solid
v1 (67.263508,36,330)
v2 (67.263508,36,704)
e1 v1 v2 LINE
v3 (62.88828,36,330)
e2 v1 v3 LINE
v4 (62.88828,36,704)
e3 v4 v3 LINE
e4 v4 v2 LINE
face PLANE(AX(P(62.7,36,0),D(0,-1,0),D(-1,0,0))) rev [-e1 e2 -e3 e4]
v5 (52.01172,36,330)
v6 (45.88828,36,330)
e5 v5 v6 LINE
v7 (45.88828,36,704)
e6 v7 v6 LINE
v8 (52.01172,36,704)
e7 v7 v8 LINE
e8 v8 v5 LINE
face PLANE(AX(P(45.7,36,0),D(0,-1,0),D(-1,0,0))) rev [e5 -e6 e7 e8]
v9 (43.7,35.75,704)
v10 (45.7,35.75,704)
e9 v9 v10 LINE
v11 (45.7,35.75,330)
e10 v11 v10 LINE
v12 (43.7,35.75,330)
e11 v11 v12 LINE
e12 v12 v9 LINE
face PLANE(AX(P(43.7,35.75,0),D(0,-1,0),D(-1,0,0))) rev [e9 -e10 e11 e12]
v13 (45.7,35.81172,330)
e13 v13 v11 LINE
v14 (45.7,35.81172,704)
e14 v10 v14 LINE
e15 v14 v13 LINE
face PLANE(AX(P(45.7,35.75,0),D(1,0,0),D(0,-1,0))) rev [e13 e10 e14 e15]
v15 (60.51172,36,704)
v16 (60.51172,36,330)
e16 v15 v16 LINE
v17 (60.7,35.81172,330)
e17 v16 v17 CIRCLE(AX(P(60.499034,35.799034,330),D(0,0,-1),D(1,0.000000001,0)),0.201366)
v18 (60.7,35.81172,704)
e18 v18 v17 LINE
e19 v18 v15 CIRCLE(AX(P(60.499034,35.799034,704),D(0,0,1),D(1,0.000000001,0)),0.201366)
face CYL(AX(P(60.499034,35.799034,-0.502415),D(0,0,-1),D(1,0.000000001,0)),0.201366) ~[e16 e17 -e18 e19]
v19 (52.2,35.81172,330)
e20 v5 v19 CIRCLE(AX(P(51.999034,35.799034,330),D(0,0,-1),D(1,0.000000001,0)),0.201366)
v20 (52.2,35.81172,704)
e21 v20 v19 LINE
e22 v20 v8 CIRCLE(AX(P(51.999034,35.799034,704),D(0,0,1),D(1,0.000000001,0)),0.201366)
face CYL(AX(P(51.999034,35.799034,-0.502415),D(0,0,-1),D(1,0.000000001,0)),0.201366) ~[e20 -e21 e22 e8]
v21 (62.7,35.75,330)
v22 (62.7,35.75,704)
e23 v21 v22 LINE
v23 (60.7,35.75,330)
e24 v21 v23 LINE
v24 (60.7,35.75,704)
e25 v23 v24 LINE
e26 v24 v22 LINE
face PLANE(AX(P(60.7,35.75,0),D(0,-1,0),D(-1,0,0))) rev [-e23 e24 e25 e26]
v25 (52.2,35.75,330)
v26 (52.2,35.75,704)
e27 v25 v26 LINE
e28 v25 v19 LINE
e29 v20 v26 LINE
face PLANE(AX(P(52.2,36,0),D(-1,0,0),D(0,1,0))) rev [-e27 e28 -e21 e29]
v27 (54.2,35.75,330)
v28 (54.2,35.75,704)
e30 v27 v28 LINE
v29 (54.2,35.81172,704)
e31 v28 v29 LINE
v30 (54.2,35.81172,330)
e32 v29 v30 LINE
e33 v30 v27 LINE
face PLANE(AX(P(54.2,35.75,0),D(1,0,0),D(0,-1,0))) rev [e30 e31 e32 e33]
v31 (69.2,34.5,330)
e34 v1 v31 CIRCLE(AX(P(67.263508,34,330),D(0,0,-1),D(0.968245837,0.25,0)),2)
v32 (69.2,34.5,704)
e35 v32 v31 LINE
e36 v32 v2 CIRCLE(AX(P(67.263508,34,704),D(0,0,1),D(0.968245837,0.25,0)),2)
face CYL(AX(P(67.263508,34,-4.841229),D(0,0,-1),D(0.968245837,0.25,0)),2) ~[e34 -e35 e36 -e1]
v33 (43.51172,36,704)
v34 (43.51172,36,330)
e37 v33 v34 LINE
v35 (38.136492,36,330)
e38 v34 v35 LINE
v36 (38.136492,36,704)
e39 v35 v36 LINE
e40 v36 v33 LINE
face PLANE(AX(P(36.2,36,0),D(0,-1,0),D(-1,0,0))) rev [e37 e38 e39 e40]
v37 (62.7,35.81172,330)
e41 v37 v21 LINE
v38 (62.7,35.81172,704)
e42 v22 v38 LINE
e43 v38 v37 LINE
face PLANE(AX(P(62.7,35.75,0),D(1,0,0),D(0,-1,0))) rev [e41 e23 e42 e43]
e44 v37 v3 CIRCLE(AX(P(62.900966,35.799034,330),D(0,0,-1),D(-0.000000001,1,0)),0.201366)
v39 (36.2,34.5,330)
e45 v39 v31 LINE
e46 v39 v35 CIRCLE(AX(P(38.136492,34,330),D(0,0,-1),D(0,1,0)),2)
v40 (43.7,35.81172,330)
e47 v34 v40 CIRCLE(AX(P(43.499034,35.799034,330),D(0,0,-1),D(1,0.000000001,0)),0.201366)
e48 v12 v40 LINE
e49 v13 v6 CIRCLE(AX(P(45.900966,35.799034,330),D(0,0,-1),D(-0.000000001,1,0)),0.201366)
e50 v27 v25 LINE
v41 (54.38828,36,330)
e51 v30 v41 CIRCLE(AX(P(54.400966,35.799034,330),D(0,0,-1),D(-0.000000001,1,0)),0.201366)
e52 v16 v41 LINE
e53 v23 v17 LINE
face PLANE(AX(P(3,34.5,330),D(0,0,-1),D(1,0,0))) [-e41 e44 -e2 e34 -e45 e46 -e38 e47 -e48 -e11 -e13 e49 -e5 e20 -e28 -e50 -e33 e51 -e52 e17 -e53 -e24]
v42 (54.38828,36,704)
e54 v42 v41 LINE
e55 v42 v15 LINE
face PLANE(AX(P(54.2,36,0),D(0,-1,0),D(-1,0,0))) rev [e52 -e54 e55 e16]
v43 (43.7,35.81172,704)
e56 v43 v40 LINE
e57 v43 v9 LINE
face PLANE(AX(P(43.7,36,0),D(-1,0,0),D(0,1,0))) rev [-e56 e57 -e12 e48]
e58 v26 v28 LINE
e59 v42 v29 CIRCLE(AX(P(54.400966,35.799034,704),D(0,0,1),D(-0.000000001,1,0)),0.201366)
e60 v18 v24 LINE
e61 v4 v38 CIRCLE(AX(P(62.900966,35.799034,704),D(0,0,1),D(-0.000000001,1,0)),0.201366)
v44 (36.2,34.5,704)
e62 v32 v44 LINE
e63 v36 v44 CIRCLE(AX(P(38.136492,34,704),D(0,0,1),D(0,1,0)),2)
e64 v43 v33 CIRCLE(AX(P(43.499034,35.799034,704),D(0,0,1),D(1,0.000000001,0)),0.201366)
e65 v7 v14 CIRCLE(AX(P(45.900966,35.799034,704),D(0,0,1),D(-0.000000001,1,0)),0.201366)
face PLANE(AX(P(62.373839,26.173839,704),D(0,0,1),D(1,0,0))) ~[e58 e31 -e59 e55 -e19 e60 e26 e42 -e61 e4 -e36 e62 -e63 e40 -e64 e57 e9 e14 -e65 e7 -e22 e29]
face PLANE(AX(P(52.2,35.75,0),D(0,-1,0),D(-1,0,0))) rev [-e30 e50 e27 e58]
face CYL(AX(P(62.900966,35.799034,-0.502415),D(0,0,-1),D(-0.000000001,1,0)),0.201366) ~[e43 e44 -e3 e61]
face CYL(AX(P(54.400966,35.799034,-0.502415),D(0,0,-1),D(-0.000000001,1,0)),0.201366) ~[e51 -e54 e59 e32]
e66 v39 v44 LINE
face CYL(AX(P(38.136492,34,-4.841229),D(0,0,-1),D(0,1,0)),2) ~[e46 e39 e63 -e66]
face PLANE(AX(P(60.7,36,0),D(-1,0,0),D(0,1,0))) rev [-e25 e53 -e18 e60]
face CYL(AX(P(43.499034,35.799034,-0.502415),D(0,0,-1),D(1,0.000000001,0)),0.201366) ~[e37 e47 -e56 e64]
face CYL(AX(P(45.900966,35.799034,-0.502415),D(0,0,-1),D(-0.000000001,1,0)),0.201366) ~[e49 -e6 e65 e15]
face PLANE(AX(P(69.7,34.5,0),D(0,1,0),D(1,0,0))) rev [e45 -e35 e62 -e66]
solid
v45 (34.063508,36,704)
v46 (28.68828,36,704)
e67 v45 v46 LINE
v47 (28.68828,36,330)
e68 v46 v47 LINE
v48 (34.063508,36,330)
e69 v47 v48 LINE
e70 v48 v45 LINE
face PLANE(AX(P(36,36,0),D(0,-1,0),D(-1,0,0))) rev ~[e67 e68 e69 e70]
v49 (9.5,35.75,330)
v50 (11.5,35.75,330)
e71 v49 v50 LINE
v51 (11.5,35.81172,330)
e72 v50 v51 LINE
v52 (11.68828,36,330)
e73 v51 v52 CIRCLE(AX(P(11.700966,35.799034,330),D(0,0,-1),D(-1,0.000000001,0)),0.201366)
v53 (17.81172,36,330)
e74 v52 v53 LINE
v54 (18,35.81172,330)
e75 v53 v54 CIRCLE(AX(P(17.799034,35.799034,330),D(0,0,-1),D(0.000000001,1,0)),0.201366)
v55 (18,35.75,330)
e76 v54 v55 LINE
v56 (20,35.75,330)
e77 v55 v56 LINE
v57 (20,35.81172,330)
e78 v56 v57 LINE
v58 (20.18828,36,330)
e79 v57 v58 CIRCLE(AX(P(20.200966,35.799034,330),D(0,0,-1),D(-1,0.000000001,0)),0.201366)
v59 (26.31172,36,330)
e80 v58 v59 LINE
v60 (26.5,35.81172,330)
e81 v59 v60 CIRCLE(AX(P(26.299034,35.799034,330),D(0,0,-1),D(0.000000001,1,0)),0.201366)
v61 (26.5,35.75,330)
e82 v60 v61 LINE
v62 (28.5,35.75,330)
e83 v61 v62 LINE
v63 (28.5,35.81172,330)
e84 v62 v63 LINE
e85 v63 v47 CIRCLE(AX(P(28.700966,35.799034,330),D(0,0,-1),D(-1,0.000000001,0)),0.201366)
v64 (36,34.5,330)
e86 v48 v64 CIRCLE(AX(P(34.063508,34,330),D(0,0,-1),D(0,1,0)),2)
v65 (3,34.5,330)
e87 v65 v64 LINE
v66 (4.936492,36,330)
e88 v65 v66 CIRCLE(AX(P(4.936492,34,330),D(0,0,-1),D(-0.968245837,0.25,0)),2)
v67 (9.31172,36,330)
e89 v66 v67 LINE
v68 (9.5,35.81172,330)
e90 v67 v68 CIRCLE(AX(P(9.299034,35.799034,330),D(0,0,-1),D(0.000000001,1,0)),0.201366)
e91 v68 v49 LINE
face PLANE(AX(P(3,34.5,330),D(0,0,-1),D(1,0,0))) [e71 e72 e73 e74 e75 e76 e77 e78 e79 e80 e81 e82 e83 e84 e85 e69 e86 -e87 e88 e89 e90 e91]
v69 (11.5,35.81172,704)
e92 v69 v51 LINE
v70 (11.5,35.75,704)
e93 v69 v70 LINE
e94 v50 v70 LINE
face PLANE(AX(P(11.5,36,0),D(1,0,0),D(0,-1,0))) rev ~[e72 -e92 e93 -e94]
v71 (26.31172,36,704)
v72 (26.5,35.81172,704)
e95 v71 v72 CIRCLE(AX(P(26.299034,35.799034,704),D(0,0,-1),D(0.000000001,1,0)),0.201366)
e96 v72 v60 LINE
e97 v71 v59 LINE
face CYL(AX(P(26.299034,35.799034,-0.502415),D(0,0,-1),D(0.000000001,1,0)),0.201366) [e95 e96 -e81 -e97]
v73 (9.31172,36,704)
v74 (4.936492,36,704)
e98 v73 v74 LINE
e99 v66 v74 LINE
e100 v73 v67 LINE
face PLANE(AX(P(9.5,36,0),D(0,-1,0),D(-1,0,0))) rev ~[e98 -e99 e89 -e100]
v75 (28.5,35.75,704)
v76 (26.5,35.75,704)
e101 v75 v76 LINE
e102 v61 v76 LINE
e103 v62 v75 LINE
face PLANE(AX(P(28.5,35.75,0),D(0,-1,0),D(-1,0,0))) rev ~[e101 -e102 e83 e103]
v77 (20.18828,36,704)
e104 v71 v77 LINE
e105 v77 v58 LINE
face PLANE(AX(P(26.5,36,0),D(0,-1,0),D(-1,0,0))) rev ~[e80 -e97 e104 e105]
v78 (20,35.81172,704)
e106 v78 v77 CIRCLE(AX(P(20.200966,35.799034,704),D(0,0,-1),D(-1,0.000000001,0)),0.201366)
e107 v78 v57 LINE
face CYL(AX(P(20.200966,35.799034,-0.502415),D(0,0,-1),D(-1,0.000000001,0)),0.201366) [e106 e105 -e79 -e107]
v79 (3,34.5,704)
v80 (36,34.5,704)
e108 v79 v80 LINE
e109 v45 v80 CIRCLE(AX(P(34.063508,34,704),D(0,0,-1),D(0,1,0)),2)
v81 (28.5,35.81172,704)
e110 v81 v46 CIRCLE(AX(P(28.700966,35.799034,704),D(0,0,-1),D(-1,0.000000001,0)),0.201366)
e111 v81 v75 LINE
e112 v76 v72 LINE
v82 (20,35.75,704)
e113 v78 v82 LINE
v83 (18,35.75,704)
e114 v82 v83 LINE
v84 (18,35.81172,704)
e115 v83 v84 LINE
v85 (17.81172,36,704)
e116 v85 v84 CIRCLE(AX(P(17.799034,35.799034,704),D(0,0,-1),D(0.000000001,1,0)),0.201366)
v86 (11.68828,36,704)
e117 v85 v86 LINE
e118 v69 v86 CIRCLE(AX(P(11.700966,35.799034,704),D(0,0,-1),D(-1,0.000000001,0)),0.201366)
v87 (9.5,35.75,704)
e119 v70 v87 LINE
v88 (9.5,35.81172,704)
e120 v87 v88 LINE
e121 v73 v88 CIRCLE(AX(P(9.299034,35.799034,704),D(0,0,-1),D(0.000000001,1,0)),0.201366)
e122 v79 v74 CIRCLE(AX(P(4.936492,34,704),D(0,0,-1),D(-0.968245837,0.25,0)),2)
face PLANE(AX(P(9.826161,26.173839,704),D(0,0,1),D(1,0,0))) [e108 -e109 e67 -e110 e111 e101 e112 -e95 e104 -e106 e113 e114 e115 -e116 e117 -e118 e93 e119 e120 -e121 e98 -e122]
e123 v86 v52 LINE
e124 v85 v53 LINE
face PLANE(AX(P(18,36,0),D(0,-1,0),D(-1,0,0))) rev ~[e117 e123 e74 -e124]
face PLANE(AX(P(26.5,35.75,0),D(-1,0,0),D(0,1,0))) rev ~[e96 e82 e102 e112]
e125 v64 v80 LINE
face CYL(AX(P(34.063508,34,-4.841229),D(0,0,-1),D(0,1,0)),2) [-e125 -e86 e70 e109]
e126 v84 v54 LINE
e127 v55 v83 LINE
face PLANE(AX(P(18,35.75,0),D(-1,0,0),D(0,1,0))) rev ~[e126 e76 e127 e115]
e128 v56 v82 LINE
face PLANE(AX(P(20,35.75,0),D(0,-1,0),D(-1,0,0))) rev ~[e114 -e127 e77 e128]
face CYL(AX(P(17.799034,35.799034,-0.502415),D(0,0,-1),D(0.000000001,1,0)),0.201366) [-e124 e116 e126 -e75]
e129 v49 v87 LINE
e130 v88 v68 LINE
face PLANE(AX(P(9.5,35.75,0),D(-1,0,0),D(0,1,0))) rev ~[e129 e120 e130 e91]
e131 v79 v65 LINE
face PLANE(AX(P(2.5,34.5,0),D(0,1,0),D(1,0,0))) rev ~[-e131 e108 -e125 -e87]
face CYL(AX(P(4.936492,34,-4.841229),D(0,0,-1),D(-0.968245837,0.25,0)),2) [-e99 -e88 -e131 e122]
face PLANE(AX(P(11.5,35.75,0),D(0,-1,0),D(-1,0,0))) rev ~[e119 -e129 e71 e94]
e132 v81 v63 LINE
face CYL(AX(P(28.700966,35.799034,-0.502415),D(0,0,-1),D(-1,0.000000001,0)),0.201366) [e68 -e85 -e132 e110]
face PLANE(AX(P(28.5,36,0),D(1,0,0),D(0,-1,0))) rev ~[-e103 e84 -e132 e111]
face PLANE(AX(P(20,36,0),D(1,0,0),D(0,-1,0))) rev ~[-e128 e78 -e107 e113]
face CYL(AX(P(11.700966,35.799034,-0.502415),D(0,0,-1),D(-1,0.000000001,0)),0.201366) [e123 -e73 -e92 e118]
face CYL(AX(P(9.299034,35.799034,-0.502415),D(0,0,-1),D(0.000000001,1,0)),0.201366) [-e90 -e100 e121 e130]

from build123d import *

# Parameters (mm, degrees)
F1_DEPTH    = 704
F3_DEPTH    = 704.001
F4_T1_DEPTH = 713.6824583655
F5_T1_DEPTH = 705.0048304175
F8_W        = 165.4744656086
F8_H        = 350.9649447352
F9_DEPTH    = 1.501


# Not quite as in the source:
# - a fillet or chamfer that OpenCascade refuses, or shapes differently, is made with other operations: its cross-section is extruded or revolved along the edge and cut away or added


with BuildPart() as f1:
    # F0 (on Top) → F1 (new body)
    with BuildSketch(Plane.XY):
        with BuildLine():
            Line((0, 7.5), (0, 0))
            Line((0, 0), (1.5, 0))
            Line((1.5, 0), (1.5, 33.5))
            ThreePointArc((1.5, 33.5), (1.5761204675, 33.8826834324), (1.7928932188, 34.2071067812))
            ThreePointArc((1.7928932188, 34.2071067812), (2.1173165676, 34.4238795325), (2.5, 34.5))
            Line((2.5, 34.5), (36, 34.5))
            Line((36, 34.5), (36, 36))
            Line((36, 36), (28.5, 36))
            Line((28.5, 36), (28.5, 35.75))
            Line((28.5, 35.75), (26.5, 35.75))
            Line((26.5, 35.75), (26.5, 36))
            Line((26.5, 36), (20, 36))
            Line((20, 36), (20, 35.75))
            Line((20, 35.75), (18, 35.75))
            Line((18, 35.75), (18, 36))
            Line((18, 36), (11.5, 36))
            Line((11.5, 36), (11.5, 35.75))
            Line((11.5, 35.75), (9.5, 35.75))
            Line((9.5, 35.75), (9.5, 36))
            Line((9.5, 36), (2, 36))
            ThreePointArc((2, 36), (1.2346331353, 35.847759065), (0.5857864376, 35.4142135624))
            ThreePointArc((0.5857864376, 35.4142135624), (0.152240935, 34.7653668647), (0, 34))
            Line((0, 34), (0, 26.5))
            Line((0, 26.5), (0.25, 26.5))
            Line((0.25, 26.5), (0.25, 24.5))
            Line((0.25, 24.5), (0, 24.5))
            Line((0, 24.5), (0, 18))
            Line((0, 18), (0.25, 18))
            Line((0.25, 18), (0.25, 16))
            Line((0.25, 16), (0, 16))
            Line((0, 16), (0, 9.5))
            Line((0, 9.5), (0.25, 9.5))
            Line((0.25, 9.5), (0.25, 7.5))
            Line((0.25, 7.5), (0, 7.5))
        make_face()
    extrude(amount=F1_DEPTH)

    # F2 (on face) → F3 (cut, through all)
    with BuildSketch(Plane.XY.offset(704)):
        with BuildLine():
            Line((2, 36), (3, 36))
            Line((3, 36), (3, 37.0590753547))
            Line((3, 37.0590753547), (0, 37.0590753547))
            Line((0, 37.0590753547), (0, 34))
            ThreePointArc((0, 34), (0.5857864376, 35.4142135624), (2, 36))
        make_face()
        with BuildLine():
            Line((1.5, 33.5), (1.5, 0))
            Line((1.5, 0), (3, 0))
            Line((3, 0), (3, 34.5))
            Line((3, 34.5), (2.5, 34.5))
            ThreePointArc((2.5, 34.5), (1.7928932188, 34.2071067812), (1.5, 33.5))
        make_face()
        with BuildLine():
            Line((0, 7.5), (0, 0))
            Line((0, 0), (1.5, 0))
            Line((1.5, 0), (1.5, 33.5))
            ThreePointArc((1.5, 33.5), (1.7928932188, 34.2071067812), (2.5, 34.5))
            Line((2.5, 34.5), (3, 34.5))
            Line((3, 34.5), (3, 36))
            Line((3, 36), (2, 36))
            ThreePointArc((2, 36), (0.5857864376, 35.4142135624), (0, 34))
            Line((0, 34), (0, 26.5))
            Line((0, 26.5), (0.25, 26.5))
            Line((0.25, 26.5), (0.25, 24.5))
            Line((0.25, 24.5), (0, 24.5))
            Line((0, 24.5), (0, 18))
            Line((0, 18), (0.25, 18))
            Line((0.25, 18), (0.25, 16))
            Line((0.25, 16), (0, 16))
            Line((0, 16), (0, 9.5))
            Line((0, 9.5), (0.25, 9.5))
            Line((0.25, 9.5), (0.25, 7.5))
            Line((0.25, 7.5), (0, 7.5))
        make_face()
    extrude(amount=-F3_DEPTH, mode=Mode.SUBTRACT)

    # F4: fillet of radius 2 on 2 edges, made by hand

    # F4_s2 → F4_t1 (cut)
    with BuildSketch(Plane.XY.offset(-4.8412291828)):
        with BuildLine():
            ThreePointArc((3, 34.5), (3.7117468017, 35.5811388301), (4.9364916731, 36))
            Line((4.9364916731, 36), (3, 36))
            Line((3, 36), (3, 34.5))
        make_face()
        with BuildLine():
            ThreePointArc((34.0635083269, 36), (35.2882531983, 35.5811388301), (36, 34.5))
            Line((36, 34.5), (36, 36))
            Line((36, 36), (34.0635083269, 36))
        make_face()
    extrude(amount=F4_T1_DEPTH, mode=Mode.SUBTRACT)

    # F5: fillet of radius 0.2 on 6 edges, made by hand

    # F5_s2 → F5_t1 (cut)
    with BuildSketch(Plane.XY.offset(-0.5024152088)):
        with BuildLine():
            ThreePointArc((17.7990343146, 36.0004), (17.9414213562, 35.9414213562), (18.0004, 35.7990343146))
            Line((18.0004, 35.7990343146), (18.0205365685, 35.7990343146))
            ThreePointArc((18.0205365685, 35.7990343146), (18.0201365685, 35.8995171573), (18.0201365685, 36))
            Line((18.0201365685, 36), (18, 36.0201365685))
            ThreePointArc((18, 36.0201365685), (17.8995171573, 36.0201365685), (17.7990343146, 36.0205365685))
            Line((17.7990343146, 36.0205365685), (17.7990343146, 36.0004))
        make_face()
        with BuildLine():
            ThreePointArc((19.9996, 35.7990343146), (20.0585786438, 35.9414213562), (20.2009656854, 36.0004))
            Line((20.2009656854, 36.0004), (20.2009656854, 36.0205365685))
            ThreePointArc((20.2009656854, 36.0205365685), (20.1004828427, 36.0201365685), (20, 36.0201365685))
            Line((20, 36.0201365685), (19.9798634315, 36))
            ThreePointArc((19.9798634315, 36), (19.9798634315, 35.8995171573), (19.9794634315, 35.7990343146))
            Line((19.9794634315, 35.7990343146), (19.9996, 35.7990343146))
        make_face()
        with BuildLine():
            ThreePointArc((28.4996, 35.7990343146), (28.5585786438, 35.9414213562), (28.7009656854, 36.0004))
            Line((28.7009656854, 36.0004), (28.7009656854, 36.0205365685))
            ThreePointArc((28.7009656854, 36.0205365685), (28.6004828427, 36.0201365685), (28.5, 36.0201365685))
            Line((28.5, 36.0201365685), (28.4798634315, 36))
            ThreePointArc((28.4798634315, 36), (28.4798634315, 35.8995171573), (28.4794634315, 35.7990343146))
            Line((28.4794634315, 35.7990343146), (28.4996, 35.7990343146))
        make_face()
        with BuildLine():
            ThreePointArc((26.2990343146, 36.0004), (26.4414213562, 35.9414213562), (26.5004, 35.7990343146))
            Line((26.5004, 35.7990343146), (26.5205365685, 35.7990343146))
            ThreePointArc((26.5205365685, 35.7990343146), (26.5201365685, 35.8995171573), (26.5201365685, 36))
            Line((26.5201365685, 36), (26.5, 36.0201365685))
            ThreePointArc((26.5, 36.0201365685), (26.3995171573, 36.0201365685), (26.2990343146, 36.0205365685))
            Line((26.2990343146, 36.0205365685), (26.2990343146, 36.0004))
        make_face()
        with BuildLine():
            ThreePointArc((9.2990343146, 36.0004), (9.4414213562, 35.9414213562), (9.5004, 35.7990343146))
            Line((9.5004, 35.7990343146), (9.5205365685, 35.7990343146))
            ThreePointArc((9.5205365685, 35.7990343146), (9.5201365685, 35.8995171573), (9.5201365685, 36))
            Line((9.5201365685, 36), (9.5, 36.0201365685))
            ThreePointArc((9.5, 36.0201365685), (9.3995171573, 36.0201365685), (9.2990343146, 36.0205365685))
            Line((9.2990343146, 36.0205365685), (9.2990343146, 36.0004))
        make_face()
        with BuildLine():
            ThreePointArc((11.4996, 35.7990343146), (11.5585786438, 35.9414213562), (11.7009656854, 36.0004))
            Line((11.7009656854, 36.0004), (11.7009656854, 36.0205365685))
            ThreePointArc((11.7009656854, 36.0205365685), (11.6004828427, 36.0201365685), (11.5, 36.0201365685))
            Line((11.5, 36.0201365685), (11.4798634315, 36))
            ThreePointArc((11.4798634315, 36), (11.4798634315, 35.8995171573), (11.4794634315, 35.7990343146))
            Line((11.4794634315, 35.7990343146), (11.4996, 35.7990343146))
        make_face()
    extrude(amount=F5_T1_DEPTH, mode=Mode.SUBTRACT)


with BuildPart() as f7_1:
    # F7: instance of F1
    add(f1.part.mirror(Plane.YZ.offset(36.1)))


with BuildPart() as f9_tool:
    # F8 (on face) → F9 (new body, through all)
    with BuildSketch(Plane.XZ.offset(-34.5)):
        with Locations((85.7372328043, 154.5175276324)):
            Rectangle(F8_W, F8_H)
    extrude(amount=-F9_DEPTH)


with BuildPart() as f1_1:
    add(f1.part)

    # F9: cut by f9_tool
    add(f9_tool.part, mode=Mode.SUBTRACT)


with BuildPart() as f7_1_1:
    add(f7_1.part)

    # F9: cut by f9_tool
    add(f9_tool.part, mode=Mode.SUBTRACT)


solid = Compound([f1_1.part, f7_1_1.part])
